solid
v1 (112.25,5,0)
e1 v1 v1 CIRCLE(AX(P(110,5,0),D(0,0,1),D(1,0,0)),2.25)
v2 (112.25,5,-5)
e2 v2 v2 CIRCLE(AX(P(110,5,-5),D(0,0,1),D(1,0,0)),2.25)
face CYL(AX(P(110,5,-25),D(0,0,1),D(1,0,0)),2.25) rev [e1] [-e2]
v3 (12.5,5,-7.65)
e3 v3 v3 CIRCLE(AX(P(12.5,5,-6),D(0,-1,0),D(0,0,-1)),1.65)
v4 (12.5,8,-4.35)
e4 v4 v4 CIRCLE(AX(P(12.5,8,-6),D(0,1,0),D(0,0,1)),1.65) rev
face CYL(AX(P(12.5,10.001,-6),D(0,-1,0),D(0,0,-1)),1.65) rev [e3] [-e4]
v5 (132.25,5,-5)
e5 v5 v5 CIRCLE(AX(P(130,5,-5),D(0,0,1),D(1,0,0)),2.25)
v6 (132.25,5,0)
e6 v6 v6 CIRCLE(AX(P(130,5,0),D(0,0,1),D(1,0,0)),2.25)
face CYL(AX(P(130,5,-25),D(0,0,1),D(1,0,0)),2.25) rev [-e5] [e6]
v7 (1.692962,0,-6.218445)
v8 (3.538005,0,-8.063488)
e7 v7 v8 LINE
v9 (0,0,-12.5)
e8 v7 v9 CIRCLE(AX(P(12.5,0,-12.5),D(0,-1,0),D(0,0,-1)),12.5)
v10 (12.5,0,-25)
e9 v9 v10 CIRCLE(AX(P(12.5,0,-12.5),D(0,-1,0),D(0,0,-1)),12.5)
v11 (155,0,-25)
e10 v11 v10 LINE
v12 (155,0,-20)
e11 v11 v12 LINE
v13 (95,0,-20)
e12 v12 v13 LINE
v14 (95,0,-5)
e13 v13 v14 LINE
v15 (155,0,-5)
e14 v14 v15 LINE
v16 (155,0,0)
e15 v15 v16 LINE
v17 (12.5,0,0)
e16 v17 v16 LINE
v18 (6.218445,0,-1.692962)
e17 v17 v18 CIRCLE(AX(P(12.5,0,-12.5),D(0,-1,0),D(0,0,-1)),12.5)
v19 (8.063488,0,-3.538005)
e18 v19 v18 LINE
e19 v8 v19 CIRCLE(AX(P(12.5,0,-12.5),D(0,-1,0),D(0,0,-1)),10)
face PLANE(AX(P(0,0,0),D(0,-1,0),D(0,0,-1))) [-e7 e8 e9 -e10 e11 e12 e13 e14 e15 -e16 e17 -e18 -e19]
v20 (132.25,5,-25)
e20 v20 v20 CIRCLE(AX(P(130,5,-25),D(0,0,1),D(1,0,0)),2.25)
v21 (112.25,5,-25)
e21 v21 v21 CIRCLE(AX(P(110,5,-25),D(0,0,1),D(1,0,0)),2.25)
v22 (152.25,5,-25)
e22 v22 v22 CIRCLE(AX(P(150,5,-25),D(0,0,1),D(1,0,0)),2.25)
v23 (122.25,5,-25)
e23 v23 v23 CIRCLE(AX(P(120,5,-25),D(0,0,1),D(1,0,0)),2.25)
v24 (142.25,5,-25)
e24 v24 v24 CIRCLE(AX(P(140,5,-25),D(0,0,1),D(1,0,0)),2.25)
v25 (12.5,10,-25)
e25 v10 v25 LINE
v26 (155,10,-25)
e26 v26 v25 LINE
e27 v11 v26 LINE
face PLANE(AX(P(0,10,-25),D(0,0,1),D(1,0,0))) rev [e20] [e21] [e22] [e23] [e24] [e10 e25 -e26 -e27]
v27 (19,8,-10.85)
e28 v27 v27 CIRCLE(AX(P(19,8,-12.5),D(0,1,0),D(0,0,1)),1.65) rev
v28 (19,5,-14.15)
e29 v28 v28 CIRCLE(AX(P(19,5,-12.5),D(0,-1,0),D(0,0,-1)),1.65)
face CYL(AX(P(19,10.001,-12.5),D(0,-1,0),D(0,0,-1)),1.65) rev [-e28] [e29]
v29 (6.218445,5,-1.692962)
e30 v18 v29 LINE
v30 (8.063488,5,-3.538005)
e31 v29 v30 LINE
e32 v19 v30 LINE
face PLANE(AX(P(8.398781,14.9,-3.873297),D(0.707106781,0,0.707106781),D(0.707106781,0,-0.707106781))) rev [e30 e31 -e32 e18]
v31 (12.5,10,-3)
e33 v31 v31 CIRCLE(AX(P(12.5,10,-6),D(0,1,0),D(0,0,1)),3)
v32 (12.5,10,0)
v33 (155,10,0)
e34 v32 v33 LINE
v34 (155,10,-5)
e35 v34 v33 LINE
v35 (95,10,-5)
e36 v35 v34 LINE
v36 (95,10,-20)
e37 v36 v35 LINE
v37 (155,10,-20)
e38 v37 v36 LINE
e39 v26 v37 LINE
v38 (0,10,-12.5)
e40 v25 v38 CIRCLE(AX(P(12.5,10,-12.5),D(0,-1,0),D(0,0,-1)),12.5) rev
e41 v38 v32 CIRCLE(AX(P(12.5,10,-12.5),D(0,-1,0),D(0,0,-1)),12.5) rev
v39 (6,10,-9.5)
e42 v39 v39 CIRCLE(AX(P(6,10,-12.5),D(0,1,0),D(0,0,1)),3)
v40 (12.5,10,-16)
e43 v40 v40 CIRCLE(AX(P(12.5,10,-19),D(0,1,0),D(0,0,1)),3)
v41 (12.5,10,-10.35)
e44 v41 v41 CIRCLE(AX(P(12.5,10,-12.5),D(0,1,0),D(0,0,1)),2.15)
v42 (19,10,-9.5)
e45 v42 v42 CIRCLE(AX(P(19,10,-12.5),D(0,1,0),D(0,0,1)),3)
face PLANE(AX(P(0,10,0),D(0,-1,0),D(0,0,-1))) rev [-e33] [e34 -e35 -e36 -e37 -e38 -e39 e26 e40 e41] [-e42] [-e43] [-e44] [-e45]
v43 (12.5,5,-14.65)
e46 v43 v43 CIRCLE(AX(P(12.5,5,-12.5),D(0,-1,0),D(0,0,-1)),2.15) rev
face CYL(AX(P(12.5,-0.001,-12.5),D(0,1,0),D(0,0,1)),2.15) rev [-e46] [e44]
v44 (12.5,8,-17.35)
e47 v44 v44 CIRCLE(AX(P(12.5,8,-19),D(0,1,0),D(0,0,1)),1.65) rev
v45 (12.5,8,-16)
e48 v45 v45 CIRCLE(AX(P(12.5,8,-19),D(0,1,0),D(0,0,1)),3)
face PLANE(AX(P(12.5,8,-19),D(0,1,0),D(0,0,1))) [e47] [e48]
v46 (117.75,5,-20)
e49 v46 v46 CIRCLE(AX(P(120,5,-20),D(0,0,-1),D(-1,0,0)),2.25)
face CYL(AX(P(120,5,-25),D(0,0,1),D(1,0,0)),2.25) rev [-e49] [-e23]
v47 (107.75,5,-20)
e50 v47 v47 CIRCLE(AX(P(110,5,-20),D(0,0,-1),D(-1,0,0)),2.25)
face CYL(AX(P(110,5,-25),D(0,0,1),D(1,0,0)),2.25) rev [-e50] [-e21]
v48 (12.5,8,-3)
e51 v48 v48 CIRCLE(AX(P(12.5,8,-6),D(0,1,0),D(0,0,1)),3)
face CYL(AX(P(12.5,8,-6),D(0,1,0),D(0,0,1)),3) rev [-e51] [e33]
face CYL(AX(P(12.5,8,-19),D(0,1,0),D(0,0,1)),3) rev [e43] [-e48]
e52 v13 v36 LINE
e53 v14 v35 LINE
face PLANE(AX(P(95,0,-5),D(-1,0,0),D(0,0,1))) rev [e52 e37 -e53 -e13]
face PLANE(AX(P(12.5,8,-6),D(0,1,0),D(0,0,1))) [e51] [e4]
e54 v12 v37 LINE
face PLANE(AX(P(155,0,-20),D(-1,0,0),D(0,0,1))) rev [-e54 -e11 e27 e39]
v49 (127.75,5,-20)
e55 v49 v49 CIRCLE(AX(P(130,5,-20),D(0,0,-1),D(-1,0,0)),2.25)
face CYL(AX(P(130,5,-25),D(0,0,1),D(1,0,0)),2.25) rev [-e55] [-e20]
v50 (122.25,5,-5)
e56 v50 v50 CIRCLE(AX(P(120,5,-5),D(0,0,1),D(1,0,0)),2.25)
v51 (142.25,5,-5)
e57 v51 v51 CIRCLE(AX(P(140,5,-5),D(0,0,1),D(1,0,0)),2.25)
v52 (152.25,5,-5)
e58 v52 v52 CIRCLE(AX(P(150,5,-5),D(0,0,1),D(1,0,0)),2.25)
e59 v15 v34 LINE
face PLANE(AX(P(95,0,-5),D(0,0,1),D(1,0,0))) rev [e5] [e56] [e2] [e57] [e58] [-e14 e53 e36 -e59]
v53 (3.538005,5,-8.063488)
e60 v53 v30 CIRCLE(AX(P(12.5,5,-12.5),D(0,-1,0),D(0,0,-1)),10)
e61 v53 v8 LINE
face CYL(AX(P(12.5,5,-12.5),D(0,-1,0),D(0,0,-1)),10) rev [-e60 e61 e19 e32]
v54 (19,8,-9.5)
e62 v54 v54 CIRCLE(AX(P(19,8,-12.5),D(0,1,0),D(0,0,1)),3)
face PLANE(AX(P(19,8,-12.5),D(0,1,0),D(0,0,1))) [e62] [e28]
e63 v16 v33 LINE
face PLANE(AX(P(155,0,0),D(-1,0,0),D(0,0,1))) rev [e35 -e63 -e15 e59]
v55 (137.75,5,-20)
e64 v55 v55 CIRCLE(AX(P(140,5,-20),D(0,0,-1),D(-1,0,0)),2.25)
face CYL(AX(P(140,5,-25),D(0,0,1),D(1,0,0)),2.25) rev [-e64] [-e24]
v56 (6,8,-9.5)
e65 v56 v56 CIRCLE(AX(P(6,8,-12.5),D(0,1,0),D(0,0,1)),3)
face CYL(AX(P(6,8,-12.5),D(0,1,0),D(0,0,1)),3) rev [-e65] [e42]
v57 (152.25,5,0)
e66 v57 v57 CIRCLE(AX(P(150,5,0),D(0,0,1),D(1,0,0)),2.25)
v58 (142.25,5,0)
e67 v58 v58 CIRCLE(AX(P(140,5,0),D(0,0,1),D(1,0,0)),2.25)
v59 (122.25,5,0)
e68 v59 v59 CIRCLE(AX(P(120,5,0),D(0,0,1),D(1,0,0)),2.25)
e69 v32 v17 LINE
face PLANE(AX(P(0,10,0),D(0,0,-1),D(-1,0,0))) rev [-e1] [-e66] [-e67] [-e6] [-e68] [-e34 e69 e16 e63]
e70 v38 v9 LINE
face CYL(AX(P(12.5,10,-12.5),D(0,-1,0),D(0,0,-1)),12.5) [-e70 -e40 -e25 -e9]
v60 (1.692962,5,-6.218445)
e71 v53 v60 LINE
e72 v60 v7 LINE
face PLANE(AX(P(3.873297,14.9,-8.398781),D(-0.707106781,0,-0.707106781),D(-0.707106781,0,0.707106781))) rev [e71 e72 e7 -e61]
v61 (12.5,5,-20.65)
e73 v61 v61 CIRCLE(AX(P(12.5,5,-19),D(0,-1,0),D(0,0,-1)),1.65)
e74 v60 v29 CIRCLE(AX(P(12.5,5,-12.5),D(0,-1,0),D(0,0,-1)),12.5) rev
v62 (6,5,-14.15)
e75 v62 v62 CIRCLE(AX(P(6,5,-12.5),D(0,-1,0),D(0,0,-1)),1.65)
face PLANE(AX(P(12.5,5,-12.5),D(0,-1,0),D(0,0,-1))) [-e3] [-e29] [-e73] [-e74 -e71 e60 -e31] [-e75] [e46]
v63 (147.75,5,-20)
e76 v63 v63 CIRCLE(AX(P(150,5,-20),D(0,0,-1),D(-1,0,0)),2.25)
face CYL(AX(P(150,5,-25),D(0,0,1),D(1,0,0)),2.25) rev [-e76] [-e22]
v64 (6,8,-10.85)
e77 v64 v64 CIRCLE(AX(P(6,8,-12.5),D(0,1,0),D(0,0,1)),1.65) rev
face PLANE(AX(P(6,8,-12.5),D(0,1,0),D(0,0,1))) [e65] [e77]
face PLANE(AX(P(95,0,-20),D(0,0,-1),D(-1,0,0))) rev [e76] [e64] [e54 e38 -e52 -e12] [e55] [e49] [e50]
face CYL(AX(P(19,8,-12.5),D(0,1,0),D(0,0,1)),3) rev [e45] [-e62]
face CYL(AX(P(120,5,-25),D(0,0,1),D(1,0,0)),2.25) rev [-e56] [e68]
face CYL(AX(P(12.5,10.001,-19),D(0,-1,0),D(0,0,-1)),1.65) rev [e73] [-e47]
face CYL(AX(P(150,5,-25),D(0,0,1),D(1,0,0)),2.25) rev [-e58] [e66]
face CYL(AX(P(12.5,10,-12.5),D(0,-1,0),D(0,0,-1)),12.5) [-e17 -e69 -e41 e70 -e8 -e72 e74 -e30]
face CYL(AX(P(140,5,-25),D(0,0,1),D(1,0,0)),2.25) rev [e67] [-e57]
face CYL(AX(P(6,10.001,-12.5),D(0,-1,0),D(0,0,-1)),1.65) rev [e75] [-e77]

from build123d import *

# Parameters (mm, degrees)
SKETCH1_W              = 250
SKETCH1_H              = 25
BOSS_EXTRUDE1_DEPTH    = 10
CUT_EXTRUDE1_REACH     = 253.446
SKETCH2_R              = 2.15
FILLET1_R              = 12.5
SKETCH3_R              = 2.25
CUT_EXTRUDE2_DEPTH     = 252.445819214
CUT_EXTRUDE5_REACH     = 253.446
SKETCH5_W              = 7.3
SKETCH5_H              = 4
SKETCH6_R              = 10
CUT_EXTRUDE6_DEPTH     = 5
CUT_EXTRUDE7_REACH     = 253.297
SKETCH7_R              = 1.65
CUT_EXTRUDE8_START     = -3.2
CUT_EXTRUDE8_OUTLINE_W = 6
CUT_EXTRUDE8_OUTLINE_H = 6
CUT_EXTRUDE8_DEPTH     = 6.4
SKETCH9_R              = 3
CUT_EXTRUDE9_DEPTH     = 2
CUT_EXTRUDE10_DEPTH    = 252.445819214
SKETCH11_R             = 2.25
CUT_EXTRUDE11_DEPTH    = 158.321327226


# Read off the part's stored shape, not the designer's step: Cut-Extrude8
with BuildPart() as part:
    # Sketch1 → Boss-Extrude1 (new body)
    with BuildSketch(Plane(origin=(0, 0, 0), x_dir=(1, 0, 0), z_dir=(0, 1, 0))):
        with Locations((125, 12.5)):
            Rectangle(SKETCH1_W, SKETCH1_H)
    extrude(amount=BOSS_EXTRUDE1_DEPTH)

    # Sketch2 → Cut-Extrude1 (cut, up to next)
    with BuildSketch(Plane(origin=(0, 10, 0), x_dir=(1, 0, 0), z_dir=(0, 1, 0)), mode=Mode.PRIVATE) as cut_extrude1_sk1:
        with Locations(Location((12.5, 12.5, 0), (0, 0, 270))):
            Circle(SKETCH2_R)
    cut_extrude1_tool1 = extrude(cut_extrude1_sk1.sketch, amount=-CUT_EXTRUDE1_REACH, mode=Mode.PRIVATE) & part.part
    add(cut_extrude1_tool1.solids().sort_by_distance((12.5, 10, -12.5))[0], mode=Mode.SUBTRACT)

    # Fillet1
    fillet1_edges = [part.edges().sort_by_distance(p)[0] for p in [
        (0, 5, 0),
        (0, 5, -25),
    ]]
    fillet(fillet1_edges, radius=FILLET1_R - 0.0001)  # a hair under: the kernel refuses the full size

    # Sketch3 → Cut-Extrude2 (cut, through all)
    with BuildSketch(Plane(origin=(0, 0, -25), x_dir=(-1, 0, 0), z_dir=(0, 0, -1))):
        with Locations((-244.5, 5)):
            Circle(SKETCH3_R)
        with Locations((-230.5, 5)):
            Circle(SKETCH3_R)
    extrude(amount=-CUT_EXTRUDE2_DEPTH, mode=Mode.SUBTRACT)

    # Sketch5 → Cut-Extrude5 (cut, up to next)
    with BuildSketch(Plane(origin=(0, 10, 0), x_dir=(1, 0, 0), z_dir=(0, 1, 0)), mode=Mode.PRIVATE) as cut_extrude5_sk1:
        with Locations((244.5, 19)):
            Rectangle(SKETCH5_W, SKETCH5_H)
    cut_extrude5_tool1 = extrude(cut_extrude5_sk1.sketch, amount=-CUT_EXTRUDE5_REACH, mode=Mode.PRIVATE) & part.part
    # Sketch5 → Cut-Extrude5 (cut, up to next)
    with BuildSketch(Plane(origin=(0, 10, 0), x_dir=(1, 0, 0), z_dir=(0, 1, 0)), mode=Mode.PRIVATE) as cut_extrude5_sk2:
        with Locations((244.5, 6)):
            Rectangle(SKETCH5_W, SKETCH5_H)
    cut_extrude5_tool2 = extrude(cut_extrude5_sk2.sketch, amount=-CUT_EXTRUDE5_REACH, mode=Mode.PRIVATE) & part.part
    # Sketch5 → Cut-Extrude5 (cut, up to next)
    with BuildSketch(Plane(origin=(0, 10, 0), x_dir=(1, 0, 0), z_dir=(0, 1, 0)), mode=Mode.PRIVATE) as cut_extrude5_sk3:
        with Locations((230.5, 19)):
            Rectangle(SKETCH5_W, SKETCH5_H)
    cut_extrude5_tool3 = extrude(cut_extrude5_sk3.sketch, amount=-CUT_EXTRUDE5_REACH, mode=Mode.PRIVATE) & part.part
    # Sketch5 → Cut-Extrude5 (cut, up to next)
    with BuildSketch(Plane(origin=(0, 10, 0), x_dir=(1, 0, 0), z_dir=(0, 1, 0)), mode=Mode.PRIVATE) as cut_extrude5_sk4:
        with Locations((230.5, 6)):
            Rectangle(SKETCH5_W, SKETCH5_H)
    cut_extrude5_tool4 = extrude(cut_extrude5_sk4.sketch, amount=-CUT_EXTRUDE5_REACH, mode=Mode.PRIVATE) & part.part
    add(cut_extrude5_tool1.solids().sort_by_distance((244.5, 10, -19))[0], mode=Mode.SUBTRACT)
    add(cut_extrude5_tool2.solids().sort_by_distance((244.5, 10, -6))[0], mode=Mode.SUBTRACT)
    add(cut_extrude5_tool3.solids().sort_by_distance((230.5, 10, -19))[0], mode=Mode.SUBTRACT)
    add(cut_extrude5_tool4.solids().sort_by_distance((230.5, 10, -6))[0], mode=Mode.SUBTRACT)

    # Sketch6 → Cut-Extrude6 (cut)
    with BuildSketch(Plane.XZ):
        with Locations(Location((12.5, -12.5, 0), (0, 0, 270))):
            Circle(SKETCH6_R)
    extrude(amount=-CUT_EXTRUDE6_DEPTH, mode=Mode.SUBTRACT)

    # Sketch7 → Cut-Extrude7 (cut, up to next)
    with BuildSketch(Plane.XZ.offset(-5), mode=Mode.PRIVATE) as cut_extrude7_sk1:
        with Locations(Location((12.5, -6, 0), (0, 0, 270))):
            Circle(SKETCH7_R)
    cut_extrude7_tool1 = extrude(cut_extrude7_sk1.sketch, amount=-CUT_EXTRUDE7_REACH, mode=Mode.PRIVATE) & part.part
    # Sketch7 → Cut-Extrude7 (cut, up to next)
    with BuildSketch(Plane.XZ.offset(-5), mode=Mode.PRIVATE) as cut_extrude7_sk2:
        with Locations(Location((19, -12.5, 0), (0, 0, 270))):
            Circle(SKETCH7_R)
    cut_extrude7_tool2 = extrude(cut_extrude7_sk2.sketch, amount=-CUT_EXTRUDE7_REACH, mode=Mode.PRIVATE) & part.part
    # Sketch7 → Cut-Extrude7 (cut, up to next)
    with BuildSketch(Plane.XZ.offset(-5), mode=Mode.PRIVATE) as cut_extrude7_sk3:
        with Locations(Location((12.5, -19, 0), (0, 0, 270))):
            Circle(SKETCH7_R)
    cut_extrude7_tool3 = extrude(cut_extrude7_sk3.sketch, amount=-CUT_EXTRUDE7_REACH, mode=Mode.PRIVATE) & part.part
    # Sketch7 → Cut-Extrude7 (cut, up to next)
    with BuildSketch(Plane.XZ.offset(-5), mode=Mode.PRIVATE) as cut_extrude7_sk4:
        with Locations(Location((6, -12.5, 0), (0, 0, 270))):
            Circle(SKETCH7_R)
    cut_extrude7_tool4 = extrude(cut_extrude7_sk4.sketch, amount=-CUT_EXTRUDE7_REACH, mode=Mode.PRIVATE) & part.part
    add(cut_extrude7_tool1.solids().sort_by_distance((12.5, 5, -6))[0], mode=Mode.SUBTRACT)
    add(cut_extrude7_tool2.solids().sort_by_distance((19, 5, -12.5))[0], mode=Mode.SUBTRACT)
    add(cut_extrude7_tool3.solids().sort_by_distance((12.5, 5, -19))[0], mode=Mode.SUBTRACT)
    add(cut_extrude7_tool4.solids().sort_by_distance((6, 5, -12.5))[0], mode=Mode.SUBTRACT)

    # Cut-Extrude8 outline → Cut-Extrude8 (cut)
    with BuildSketch(Plane(origin=(0, 0, 0), x_dir=(0.707106781186548, 0, -0.707106781186547), z_dir=(0.707106781186547, 0, 0.707106781186548)).offset(CUT_EXTRUDE8_START)):
        with Locations((7, 2)):
            Rectangle(CUT_EXTRUDE8_OUTLINE_W, CUT_EXTRUDE8_OUTLINE_H)
    extrude(amount=CUT_EXTRUDE8_DEPTH, mode=Mode.SUBTRACT)

    # Sketch9 → Cut-Extrude9 (cut)
    with BuildSketch(Plane(origin=(0, 10, 0), x_dir=(1, 0, 0), z_dir=(0, 1, 0))):
        with Locations(Location((12.5, 19, 0), (0, 0, 270))):
            Circle(SKETCH9_R)
        with Locations(Location((19, 12.5, 0), (0, 0, 270))):
            Circle(SKETCH9_R)
        with Locations(Location((12.5, 6, 0), (0, 0, 270))):
            Circle(SKETCH9_R)
        with Locations(Location((6, 12.5, 0), (0, 0, 270))):
            Circle(SKETCH9_R)
    extrude(amount=-CUT_EXTRUDE9_DEPTH, mode=Mode.SUBTRACT)

    # Sketch10 → Cut-Extrude10 (cut, through all)
    with BuildSketch(Plane(origin=(0, 10, 0), x_dir=(1, 0, 0), z_dir=(0, 1, 0))):
        Polygon((95, 5), (155, 5), (155, 0), (250, 0), (250, 25), (155, 25), (155, 20), (95, 20), align=None)
    extrude(amount=-CUT_EXTRUDE10_DEPTH, mode=Mode.SUBTRACT)

    # Sketch11 → Cut-Extrude11 (cut, through all)
    with BuildSketch(Plane.XY):
        with Locations((150, 5)):
            Circle(SKETCH11_R)
        with Locations((140, 5)):
            Circle(SKETCH11_R)
        with Locations((130, 5)):
            Circle(SKETCH11_R)
        with Locations((120, 5)):
            Circle(SKETCH11_R)
        with Locations((110, 5)):
            Circle(SKETCH11_R)
    extrude(amount=-CUT_EXTRUDE11_DEPTH, mode=Mode.SUBTRACT)


solid = part.part
